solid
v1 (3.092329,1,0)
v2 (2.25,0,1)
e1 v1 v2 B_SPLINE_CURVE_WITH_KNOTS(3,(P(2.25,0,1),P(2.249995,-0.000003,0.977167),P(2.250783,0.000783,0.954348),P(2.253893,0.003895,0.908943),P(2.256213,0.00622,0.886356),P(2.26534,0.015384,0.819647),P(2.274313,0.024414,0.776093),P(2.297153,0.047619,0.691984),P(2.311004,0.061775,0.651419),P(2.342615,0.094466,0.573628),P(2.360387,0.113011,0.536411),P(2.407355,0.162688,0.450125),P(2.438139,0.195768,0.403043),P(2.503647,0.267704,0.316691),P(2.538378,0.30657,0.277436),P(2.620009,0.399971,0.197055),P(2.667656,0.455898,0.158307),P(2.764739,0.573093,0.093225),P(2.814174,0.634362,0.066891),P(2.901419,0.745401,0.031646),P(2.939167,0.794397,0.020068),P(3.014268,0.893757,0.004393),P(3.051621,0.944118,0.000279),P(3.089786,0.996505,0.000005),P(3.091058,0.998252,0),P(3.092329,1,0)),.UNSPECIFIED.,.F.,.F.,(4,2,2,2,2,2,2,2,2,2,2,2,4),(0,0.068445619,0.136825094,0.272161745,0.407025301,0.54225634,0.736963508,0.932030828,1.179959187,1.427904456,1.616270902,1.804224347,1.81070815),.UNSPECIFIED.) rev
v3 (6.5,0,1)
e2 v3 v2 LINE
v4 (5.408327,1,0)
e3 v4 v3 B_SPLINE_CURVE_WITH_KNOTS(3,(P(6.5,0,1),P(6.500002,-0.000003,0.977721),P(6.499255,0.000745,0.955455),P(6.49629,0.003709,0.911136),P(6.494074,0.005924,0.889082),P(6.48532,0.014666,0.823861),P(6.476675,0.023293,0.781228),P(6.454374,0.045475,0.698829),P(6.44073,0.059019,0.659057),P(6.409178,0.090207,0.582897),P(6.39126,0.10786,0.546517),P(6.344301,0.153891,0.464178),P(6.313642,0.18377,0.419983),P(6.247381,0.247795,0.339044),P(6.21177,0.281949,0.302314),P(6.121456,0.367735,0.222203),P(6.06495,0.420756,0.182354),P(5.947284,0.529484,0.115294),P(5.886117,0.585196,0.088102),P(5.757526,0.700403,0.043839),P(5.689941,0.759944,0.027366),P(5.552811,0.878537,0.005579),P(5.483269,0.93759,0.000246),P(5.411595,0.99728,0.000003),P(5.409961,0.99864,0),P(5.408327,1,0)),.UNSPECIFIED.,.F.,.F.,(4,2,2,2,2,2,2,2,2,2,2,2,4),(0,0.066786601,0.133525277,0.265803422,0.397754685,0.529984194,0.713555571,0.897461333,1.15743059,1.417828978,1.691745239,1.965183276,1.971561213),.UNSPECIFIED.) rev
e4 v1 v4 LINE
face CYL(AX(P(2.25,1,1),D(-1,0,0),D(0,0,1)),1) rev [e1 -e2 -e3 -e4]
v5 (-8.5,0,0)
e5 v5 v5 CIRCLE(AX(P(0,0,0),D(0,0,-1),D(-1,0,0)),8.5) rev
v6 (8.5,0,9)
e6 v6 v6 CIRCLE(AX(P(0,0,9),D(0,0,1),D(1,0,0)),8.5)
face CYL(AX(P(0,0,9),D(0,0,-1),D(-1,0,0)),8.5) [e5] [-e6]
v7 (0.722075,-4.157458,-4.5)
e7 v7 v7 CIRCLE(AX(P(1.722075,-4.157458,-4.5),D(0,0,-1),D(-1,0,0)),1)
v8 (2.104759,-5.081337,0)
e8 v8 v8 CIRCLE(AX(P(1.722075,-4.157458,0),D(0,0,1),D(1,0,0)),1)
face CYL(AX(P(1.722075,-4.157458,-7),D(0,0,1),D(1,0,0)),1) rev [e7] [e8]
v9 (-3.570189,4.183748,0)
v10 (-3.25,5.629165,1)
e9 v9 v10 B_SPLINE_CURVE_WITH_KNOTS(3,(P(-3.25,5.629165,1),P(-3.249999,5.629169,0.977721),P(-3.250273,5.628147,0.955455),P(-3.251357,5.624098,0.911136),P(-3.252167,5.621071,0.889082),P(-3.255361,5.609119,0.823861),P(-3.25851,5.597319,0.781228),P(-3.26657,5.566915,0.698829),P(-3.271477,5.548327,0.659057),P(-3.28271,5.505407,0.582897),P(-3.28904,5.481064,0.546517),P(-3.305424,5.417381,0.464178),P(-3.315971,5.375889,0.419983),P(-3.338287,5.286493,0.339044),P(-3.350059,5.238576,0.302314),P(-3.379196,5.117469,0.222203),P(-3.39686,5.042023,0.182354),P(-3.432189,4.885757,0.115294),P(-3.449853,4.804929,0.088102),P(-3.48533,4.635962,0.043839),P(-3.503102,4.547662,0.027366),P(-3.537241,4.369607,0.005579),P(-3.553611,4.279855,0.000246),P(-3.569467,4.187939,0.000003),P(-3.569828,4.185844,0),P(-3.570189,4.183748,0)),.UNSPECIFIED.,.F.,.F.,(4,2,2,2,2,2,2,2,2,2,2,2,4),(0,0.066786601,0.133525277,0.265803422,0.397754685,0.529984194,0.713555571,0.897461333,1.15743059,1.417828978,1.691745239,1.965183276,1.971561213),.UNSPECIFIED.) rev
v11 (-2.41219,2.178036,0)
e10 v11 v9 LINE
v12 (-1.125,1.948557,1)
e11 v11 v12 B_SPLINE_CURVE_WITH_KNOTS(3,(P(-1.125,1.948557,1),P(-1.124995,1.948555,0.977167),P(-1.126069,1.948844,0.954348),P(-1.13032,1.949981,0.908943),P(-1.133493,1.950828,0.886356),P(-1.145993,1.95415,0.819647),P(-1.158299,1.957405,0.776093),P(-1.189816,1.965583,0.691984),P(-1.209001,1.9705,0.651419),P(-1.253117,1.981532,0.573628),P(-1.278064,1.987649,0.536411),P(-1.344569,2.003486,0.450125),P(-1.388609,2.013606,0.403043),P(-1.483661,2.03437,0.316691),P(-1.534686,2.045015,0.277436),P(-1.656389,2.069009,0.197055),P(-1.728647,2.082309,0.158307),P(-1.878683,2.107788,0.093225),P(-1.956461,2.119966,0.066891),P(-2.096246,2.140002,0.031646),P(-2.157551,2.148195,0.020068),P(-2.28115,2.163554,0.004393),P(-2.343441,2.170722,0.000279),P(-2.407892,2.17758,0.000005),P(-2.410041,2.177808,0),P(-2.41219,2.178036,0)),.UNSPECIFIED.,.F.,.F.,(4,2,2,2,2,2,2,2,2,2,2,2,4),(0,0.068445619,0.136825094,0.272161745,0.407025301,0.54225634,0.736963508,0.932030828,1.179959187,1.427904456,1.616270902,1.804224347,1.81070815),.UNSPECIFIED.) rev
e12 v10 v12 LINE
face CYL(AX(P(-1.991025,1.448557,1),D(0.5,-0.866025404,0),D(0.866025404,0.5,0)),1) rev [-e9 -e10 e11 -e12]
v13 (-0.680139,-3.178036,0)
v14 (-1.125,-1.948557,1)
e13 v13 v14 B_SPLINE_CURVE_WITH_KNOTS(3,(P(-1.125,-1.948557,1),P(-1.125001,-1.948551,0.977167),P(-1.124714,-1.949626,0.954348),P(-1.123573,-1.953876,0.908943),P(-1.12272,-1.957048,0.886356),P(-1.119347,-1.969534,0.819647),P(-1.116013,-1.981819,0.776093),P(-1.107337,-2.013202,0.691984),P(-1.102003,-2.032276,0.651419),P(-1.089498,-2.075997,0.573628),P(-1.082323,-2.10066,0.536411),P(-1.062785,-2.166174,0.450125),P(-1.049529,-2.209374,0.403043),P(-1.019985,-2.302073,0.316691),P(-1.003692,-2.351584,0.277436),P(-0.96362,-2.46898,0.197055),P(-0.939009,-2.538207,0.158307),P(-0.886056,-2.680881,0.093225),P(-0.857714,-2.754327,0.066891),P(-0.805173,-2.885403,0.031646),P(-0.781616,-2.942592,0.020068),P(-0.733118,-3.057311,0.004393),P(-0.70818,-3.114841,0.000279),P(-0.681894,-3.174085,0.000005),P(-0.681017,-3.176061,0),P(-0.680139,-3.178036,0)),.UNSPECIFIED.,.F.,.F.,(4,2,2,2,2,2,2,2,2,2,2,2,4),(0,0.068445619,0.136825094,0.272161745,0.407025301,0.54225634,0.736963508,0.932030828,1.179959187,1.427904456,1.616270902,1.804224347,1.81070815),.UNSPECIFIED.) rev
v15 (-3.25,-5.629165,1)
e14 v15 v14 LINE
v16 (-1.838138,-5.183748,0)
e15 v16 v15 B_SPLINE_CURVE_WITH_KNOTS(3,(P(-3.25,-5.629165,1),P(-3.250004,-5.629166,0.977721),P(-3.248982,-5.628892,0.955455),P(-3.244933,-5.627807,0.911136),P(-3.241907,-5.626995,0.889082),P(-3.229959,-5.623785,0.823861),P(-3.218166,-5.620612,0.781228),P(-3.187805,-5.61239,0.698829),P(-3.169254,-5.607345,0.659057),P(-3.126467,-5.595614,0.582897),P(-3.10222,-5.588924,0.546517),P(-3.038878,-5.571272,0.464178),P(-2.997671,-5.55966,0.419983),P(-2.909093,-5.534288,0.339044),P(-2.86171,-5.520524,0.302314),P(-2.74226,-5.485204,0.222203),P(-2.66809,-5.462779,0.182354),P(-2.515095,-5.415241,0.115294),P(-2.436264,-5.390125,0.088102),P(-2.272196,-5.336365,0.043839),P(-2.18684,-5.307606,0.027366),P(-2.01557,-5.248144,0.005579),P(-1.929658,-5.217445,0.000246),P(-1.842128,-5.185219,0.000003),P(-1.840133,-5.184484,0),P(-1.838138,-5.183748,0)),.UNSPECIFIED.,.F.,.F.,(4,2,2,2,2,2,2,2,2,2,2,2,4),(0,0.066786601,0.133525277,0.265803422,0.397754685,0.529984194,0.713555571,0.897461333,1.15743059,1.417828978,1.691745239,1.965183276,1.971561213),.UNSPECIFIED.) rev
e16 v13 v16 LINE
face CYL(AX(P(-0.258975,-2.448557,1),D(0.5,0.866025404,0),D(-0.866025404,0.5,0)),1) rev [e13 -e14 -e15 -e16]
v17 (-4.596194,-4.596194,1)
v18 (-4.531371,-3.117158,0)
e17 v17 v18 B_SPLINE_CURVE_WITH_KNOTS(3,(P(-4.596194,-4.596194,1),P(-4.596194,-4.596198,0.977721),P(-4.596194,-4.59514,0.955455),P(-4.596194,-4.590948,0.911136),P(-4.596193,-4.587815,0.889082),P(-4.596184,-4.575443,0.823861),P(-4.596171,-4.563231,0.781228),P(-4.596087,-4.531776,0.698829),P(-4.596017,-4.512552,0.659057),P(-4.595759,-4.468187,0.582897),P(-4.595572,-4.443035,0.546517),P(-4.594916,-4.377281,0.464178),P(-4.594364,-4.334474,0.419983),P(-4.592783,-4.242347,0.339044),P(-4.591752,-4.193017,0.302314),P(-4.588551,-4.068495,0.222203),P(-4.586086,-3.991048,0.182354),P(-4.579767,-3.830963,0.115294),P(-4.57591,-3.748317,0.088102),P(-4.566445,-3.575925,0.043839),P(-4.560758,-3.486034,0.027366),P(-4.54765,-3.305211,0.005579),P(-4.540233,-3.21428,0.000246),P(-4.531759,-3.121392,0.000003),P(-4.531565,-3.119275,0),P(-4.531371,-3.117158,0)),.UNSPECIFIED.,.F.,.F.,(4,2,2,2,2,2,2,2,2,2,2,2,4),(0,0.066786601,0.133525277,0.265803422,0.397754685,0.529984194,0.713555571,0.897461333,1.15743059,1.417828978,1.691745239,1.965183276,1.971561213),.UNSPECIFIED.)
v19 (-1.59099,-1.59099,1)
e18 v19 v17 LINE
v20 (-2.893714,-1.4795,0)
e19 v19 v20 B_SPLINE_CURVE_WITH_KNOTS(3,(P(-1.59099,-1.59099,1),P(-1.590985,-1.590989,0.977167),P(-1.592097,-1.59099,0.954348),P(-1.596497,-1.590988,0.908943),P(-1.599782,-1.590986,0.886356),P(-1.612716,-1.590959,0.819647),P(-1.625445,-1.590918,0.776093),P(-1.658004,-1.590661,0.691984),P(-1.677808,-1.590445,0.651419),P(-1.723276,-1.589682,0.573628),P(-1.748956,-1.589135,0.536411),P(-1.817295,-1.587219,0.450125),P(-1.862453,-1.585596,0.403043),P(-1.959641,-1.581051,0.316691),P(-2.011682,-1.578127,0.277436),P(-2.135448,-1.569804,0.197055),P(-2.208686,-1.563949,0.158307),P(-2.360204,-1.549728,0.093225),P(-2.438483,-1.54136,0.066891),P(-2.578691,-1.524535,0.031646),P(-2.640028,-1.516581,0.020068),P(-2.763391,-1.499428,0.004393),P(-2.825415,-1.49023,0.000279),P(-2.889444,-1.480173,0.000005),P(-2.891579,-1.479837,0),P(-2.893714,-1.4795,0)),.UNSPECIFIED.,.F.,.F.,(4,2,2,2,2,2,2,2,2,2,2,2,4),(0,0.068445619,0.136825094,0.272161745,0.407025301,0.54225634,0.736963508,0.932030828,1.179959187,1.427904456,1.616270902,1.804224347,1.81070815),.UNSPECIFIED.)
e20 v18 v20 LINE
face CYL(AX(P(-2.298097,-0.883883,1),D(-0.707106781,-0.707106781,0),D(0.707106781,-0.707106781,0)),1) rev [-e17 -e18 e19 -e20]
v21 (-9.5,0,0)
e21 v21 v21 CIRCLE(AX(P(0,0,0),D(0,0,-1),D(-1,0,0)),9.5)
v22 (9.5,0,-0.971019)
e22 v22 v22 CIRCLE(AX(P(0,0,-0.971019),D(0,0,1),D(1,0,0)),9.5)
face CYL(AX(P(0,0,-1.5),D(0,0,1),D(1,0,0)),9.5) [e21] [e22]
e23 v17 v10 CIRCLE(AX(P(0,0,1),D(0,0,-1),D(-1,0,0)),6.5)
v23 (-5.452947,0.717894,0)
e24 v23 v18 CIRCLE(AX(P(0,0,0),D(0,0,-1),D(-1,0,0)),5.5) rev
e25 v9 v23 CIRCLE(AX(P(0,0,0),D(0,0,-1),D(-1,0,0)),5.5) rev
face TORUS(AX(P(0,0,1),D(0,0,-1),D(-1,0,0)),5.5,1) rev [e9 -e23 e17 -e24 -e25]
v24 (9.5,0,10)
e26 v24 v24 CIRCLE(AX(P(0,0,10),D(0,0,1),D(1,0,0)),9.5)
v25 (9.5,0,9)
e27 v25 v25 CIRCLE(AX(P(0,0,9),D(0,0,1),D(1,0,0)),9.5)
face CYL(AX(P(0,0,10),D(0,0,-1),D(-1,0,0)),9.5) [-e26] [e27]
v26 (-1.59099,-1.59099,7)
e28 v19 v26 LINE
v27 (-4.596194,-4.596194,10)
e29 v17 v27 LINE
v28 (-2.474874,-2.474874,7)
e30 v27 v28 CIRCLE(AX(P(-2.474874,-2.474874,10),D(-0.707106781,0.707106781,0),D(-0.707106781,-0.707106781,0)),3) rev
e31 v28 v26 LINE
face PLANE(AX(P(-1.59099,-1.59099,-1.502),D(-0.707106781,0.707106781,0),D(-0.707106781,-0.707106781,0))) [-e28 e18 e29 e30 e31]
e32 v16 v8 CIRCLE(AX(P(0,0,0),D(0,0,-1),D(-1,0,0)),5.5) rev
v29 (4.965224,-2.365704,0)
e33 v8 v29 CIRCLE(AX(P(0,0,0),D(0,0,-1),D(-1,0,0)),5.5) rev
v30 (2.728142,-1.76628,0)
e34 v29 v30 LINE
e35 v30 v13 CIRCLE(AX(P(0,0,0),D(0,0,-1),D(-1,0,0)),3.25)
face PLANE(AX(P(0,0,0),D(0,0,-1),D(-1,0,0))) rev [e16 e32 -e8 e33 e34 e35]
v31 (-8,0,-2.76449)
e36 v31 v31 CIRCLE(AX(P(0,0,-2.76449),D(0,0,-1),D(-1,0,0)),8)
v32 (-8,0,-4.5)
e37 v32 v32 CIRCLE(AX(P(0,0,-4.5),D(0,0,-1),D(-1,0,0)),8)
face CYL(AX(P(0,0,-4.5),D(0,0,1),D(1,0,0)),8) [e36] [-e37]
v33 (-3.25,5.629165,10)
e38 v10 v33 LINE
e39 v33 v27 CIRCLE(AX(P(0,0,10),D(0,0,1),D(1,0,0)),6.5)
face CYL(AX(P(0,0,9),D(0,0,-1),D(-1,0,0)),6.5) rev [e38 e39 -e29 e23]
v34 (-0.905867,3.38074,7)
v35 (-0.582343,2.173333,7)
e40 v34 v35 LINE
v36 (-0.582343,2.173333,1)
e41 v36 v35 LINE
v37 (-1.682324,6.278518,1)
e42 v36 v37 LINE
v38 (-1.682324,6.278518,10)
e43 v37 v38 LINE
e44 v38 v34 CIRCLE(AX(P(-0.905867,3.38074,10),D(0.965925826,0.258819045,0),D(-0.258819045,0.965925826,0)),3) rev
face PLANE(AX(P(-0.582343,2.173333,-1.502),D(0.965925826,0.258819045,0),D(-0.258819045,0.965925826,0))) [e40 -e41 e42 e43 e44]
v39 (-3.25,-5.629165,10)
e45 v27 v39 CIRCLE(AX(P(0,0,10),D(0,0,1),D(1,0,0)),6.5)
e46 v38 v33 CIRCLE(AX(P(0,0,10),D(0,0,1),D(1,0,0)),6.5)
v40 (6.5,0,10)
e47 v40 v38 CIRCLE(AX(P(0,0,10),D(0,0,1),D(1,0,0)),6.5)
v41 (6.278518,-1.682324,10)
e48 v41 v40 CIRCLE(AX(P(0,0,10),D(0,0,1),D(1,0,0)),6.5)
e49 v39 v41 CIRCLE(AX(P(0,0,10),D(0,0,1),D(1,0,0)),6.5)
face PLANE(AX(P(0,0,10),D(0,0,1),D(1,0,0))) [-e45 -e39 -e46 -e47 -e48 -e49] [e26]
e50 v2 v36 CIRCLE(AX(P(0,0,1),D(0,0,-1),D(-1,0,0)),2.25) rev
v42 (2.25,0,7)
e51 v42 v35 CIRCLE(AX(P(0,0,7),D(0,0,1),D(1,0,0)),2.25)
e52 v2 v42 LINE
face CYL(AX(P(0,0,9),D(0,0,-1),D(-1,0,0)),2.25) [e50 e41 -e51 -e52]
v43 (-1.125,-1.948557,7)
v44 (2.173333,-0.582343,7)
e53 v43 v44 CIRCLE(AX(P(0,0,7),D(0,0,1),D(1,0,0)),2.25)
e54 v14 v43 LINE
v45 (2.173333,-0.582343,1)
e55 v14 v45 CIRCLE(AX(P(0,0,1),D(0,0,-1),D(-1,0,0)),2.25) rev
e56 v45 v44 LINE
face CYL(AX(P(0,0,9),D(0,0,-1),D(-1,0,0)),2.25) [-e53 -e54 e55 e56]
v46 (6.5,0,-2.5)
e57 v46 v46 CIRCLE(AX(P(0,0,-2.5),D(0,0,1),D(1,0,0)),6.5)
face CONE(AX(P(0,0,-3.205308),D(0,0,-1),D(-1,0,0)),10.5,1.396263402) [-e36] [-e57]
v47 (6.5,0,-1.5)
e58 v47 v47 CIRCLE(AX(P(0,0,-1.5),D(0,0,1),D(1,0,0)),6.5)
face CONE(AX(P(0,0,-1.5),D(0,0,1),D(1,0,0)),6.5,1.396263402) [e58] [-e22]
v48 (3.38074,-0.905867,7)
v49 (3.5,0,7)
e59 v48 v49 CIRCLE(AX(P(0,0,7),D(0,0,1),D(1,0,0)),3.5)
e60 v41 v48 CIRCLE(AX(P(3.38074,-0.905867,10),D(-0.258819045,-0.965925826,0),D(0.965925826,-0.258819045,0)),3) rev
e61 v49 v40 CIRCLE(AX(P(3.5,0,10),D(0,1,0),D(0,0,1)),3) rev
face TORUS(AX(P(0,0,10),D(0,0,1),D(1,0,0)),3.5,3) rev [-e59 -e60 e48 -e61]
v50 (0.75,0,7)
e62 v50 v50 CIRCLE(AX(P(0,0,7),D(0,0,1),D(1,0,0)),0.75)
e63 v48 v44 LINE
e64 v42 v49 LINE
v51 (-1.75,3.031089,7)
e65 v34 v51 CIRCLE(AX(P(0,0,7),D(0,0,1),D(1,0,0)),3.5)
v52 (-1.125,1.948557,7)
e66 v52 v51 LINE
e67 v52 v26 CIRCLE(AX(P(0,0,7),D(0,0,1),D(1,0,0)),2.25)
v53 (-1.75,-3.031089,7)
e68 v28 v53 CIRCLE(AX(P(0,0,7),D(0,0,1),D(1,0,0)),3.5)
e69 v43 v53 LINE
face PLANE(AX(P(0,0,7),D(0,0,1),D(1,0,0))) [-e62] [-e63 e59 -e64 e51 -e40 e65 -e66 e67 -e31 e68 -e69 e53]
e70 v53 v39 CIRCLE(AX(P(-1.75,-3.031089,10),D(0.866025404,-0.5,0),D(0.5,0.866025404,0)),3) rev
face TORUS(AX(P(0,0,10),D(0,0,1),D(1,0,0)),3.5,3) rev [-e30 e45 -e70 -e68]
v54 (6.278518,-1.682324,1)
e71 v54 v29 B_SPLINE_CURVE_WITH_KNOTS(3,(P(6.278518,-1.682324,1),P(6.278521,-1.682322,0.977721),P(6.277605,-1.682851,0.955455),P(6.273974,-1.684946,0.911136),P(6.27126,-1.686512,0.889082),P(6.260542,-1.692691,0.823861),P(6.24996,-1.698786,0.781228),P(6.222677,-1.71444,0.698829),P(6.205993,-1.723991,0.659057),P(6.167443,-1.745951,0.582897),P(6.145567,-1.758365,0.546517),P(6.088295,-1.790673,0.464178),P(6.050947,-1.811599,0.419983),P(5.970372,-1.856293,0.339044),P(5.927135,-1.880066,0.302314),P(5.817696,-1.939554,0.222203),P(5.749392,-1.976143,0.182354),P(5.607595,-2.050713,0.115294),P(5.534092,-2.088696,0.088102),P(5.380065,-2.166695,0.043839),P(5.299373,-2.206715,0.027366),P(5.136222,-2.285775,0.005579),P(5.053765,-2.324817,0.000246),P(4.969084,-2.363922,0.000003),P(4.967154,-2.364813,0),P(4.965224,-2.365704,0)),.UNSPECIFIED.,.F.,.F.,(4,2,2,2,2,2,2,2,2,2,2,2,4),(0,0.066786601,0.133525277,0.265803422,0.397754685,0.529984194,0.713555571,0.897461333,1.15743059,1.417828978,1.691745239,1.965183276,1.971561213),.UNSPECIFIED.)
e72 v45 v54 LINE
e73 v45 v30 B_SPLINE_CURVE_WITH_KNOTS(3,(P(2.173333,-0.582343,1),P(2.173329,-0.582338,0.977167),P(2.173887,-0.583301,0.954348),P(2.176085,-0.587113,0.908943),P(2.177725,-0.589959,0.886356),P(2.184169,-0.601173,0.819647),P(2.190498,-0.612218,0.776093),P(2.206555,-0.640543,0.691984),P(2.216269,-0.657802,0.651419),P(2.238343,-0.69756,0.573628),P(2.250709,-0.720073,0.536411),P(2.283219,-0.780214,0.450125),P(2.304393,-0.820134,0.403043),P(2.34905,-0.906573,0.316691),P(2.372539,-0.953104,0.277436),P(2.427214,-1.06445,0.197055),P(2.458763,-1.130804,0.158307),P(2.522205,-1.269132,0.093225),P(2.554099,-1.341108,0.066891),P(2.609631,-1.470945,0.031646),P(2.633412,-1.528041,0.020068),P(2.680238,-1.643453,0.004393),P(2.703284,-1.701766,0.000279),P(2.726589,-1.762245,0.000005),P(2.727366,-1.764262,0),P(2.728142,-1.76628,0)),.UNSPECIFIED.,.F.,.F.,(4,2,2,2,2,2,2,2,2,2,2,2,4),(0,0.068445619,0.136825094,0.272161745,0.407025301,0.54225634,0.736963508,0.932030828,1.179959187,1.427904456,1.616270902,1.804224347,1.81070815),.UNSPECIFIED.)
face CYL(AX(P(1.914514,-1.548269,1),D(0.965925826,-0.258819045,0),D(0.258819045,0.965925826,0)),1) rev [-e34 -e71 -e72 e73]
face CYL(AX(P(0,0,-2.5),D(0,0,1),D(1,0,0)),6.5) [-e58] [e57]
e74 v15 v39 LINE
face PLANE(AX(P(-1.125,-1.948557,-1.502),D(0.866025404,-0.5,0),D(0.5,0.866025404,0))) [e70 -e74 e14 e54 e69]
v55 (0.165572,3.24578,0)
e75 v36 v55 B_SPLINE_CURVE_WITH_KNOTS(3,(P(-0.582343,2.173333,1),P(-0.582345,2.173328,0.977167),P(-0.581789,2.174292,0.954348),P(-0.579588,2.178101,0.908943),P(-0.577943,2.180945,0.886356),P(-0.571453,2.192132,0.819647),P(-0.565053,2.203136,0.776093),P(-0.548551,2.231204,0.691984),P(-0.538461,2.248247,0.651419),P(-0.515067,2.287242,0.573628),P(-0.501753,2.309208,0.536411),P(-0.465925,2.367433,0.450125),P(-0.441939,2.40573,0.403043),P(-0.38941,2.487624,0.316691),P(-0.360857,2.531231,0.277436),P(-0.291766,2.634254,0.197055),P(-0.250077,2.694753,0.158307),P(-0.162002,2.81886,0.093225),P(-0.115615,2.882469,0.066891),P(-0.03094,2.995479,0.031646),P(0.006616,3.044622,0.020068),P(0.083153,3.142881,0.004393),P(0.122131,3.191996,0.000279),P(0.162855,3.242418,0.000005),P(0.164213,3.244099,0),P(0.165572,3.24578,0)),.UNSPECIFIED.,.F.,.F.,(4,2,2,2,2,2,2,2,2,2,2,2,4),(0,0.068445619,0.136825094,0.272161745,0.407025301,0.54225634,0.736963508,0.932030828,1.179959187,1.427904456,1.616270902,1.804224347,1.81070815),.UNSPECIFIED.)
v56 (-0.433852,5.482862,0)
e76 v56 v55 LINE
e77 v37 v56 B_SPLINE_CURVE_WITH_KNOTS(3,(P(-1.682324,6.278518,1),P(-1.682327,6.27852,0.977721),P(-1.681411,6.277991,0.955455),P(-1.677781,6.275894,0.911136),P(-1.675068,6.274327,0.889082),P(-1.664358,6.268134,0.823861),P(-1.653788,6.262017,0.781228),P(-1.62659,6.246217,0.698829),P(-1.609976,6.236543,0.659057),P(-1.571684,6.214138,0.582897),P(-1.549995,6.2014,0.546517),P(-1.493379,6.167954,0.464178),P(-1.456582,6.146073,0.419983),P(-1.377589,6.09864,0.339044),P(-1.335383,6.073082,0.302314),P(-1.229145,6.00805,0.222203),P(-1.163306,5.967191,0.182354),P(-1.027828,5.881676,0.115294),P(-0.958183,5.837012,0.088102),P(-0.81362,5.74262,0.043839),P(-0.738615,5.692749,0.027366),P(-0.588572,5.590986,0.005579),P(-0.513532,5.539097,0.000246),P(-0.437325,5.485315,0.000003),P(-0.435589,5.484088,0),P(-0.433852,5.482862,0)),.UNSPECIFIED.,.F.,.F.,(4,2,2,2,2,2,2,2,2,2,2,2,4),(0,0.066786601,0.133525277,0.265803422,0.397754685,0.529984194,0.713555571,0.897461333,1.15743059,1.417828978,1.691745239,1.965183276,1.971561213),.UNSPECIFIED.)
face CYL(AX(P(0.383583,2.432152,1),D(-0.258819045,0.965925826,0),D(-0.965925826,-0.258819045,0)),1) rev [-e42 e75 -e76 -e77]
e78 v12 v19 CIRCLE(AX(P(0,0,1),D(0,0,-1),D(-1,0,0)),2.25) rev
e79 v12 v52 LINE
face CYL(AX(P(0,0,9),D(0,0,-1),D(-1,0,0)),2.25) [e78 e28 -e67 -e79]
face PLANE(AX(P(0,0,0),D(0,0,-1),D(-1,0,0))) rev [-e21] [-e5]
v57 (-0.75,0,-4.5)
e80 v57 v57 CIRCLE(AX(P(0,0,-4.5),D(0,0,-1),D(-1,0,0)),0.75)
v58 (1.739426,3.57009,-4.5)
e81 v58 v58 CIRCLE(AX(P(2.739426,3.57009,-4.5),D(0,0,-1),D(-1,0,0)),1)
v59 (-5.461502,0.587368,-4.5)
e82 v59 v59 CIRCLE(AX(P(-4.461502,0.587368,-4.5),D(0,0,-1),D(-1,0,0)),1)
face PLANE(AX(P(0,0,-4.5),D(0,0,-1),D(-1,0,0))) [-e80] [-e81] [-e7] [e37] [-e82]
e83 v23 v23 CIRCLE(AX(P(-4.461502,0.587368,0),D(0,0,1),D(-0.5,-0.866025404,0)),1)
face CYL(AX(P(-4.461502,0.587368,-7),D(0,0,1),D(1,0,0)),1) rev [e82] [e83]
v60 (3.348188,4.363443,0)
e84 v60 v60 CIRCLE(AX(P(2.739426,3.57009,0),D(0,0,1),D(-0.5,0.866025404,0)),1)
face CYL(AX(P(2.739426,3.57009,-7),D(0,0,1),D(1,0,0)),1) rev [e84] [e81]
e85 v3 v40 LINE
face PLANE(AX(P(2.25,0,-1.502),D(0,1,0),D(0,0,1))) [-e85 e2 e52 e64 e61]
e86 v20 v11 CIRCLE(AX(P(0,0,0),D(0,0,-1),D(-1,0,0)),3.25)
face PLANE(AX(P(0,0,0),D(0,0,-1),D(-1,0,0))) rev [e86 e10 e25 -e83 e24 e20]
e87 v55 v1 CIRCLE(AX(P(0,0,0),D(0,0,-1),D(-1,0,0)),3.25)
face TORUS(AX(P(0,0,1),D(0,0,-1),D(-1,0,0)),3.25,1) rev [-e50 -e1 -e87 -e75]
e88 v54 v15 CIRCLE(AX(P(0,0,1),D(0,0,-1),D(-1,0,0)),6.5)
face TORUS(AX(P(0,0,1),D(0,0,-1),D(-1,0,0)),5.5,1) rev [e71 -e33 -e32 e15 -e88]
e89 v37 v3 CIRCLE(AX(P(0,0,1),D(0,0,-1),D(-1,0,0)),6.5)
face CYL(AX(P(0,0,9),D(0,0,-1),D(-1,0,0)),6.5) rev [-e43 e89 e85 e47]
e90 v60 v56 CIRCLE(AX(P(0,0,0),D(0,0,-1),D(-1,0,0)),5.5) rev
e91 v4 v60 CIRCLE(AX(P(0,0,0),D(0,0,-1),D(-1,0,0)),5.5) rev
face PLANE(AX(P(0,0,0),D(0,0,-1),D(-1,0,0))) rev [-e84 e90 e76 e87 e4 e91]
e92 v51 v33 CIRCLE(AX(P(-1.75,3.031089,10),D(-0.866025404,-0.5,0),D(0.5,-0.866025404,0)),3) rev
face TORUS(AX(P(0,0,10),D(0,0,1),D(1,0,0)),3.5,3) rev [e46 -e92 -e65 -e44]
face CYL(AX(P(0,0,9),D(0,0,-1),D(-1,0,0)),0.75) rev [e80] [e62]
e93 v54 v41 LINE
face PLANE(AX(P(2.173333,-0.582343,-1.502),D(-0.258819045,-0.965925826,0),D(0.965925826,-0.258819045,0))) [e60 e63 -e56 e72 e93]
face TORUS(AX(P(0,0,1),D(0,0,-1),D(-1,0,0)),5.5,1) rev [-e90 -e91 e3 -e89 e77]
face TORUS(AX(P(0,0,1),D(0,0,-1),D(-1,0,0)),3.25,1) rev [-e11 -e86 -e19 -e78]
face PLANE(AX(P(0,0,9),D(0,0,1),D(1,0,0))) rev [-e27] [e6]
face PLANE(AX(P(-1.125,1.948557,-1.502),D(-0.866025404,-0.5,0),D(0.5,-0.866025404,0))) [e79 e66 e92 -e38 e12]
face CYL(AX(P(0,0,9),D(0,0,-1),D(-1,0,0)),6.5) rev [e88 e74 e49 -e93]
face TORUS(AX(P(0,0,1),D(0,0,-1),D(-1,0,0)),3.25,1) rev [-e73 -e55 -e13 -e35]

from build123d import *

# Parameters (mm, degrees)
SKETCH1_R             = 8.5
SKETCH1_R_2           = 6.5
BOSS_EXTRUDE1_DEPTH   = 9
SKETCH1_R_3           = 2.25
SKETCH1_R_4           = 0.75
BOSS_EXTRUDE1_2_DEPTH = 9
SKETCH2_R             = 9.5
BOSS_EXTRUDE2_DEPTH   = 1.5
SKETCH3_R             = 9.5
SKETCH3_R_2           = 6.5
BOSS_EXTRUDE3_DEPTH   = 1
BOSS_EXTRUDE4_REACH   = 19.051
CIRPATTERN1_COUNT     = 3
CUT_EXTRUDE2_START    = -2
SKETCH6_R             = 6.5
CUT_EXTRUDE2_DEPTH    = 2
FILLET1_R             = 3
BOSS_EXTRUDE5_START   = 1
SKETCH8_R             = 6.5
BOSS_EXTRUDE5_DEPTH   = 1
SKETCH11_R            = 8
BOSS_EXTRUDE6_DEPTH   = 2
SKETCH7_R             = 1
CUT_EXTRUDE3_DEPTH    = 7
FILLET2_R             = 1
CIRPATTERN2_COUNT     = 3
CUT_EXTRUDE4_START    = -20
SKETCH4_R             = 0.75
CUT_EXTRUDE4_DEPTH    = 20


with BuildPart() as part:
    # Sketch1 → Boss-Extrude1 (new body)
    with BuildSketch(Plane.XY):
        Circle(SKETCH1_R)
        Circle(SKETCH1_R_2, mode=Mode.SUBTRACT)
    extrude(amount=BOSS_EXTRUDE1_DEPTH)



with BuildPart() as body_2:
    # Sketch1 → Boss-Extrude1 2 (new body)
    with BuildSketch(Plane.XY):
        Circle(SKETCH1_R_3)
        Circle(SKETCH1_R_4, mode=Mode.SUBTRACT)
    extrude(amount=BOSS_EXTRUDE1_2_DEPTH)


with BuildPart() as part_1:
    add(part.part)

    add(body_2.part)  # Boss-Extrude2 merges body 2
    # Sketch2 → Boss-Extrude2 (add)
    with BuildSketch(Plane(origin=(0, 0, 0), x_dir=(-1, 0, 0), z_dir=(0, 0, -1))):
        Circle(SKETCH2_R)
    extrude(amount=BOSS_EXTRUDE2_DEPTH)

    # Sketch3 → Boss-Extrude3 (add)
    with BuildSketch(Plane.XY.offset(9)):
        Circle(SKETCH3_R)
        Circle(SKETCH3_R_2, mode=Mode.SUBTRACT)
    extrude(amount=BOSS_EXTRUDE3_DEPTH)

    # Sketch5 → Boss-Extrude4 (add, up to next)
    with BuildSketch(Plane.XY.offset(9), mode=Mode.PRIVATE) as boss_extrude4_sk1:
        with BuildLine():
            Line((2.25, 0), (6.5, 0))
            ThreePointArc((6.5, 0), (6.444391599, -0.848420249), (6.278517871, -1.682323793))
            Line((6.278517871, -1.682323793), (2.173333109, -0.582342851))
            ThreePointArc((2.173333109, -0.582342851), (2.230750938, -0.293683932), (2.25, 0))
        make_face()
    boss_extrude4_tool1 = extrude(boss_extrude4_sk1.sketch, amount=-BOSS_EXTRUDE4_REACH, mode=Mode.PRIVATE) - part_1.part
    boss_extrude4 = boss_extrude4_tool1.solids().sort_by_distance((4.665326, -0.614202, 9))[0]
    add(boss_extrude4)

    # CirPattern1: Boss-Extrude4 ×3 about axis
    cirpattern1_axis = Axis((0, 0, 0), (0, 0, 1))
    for i in range(1, CIRPATTERN1_COUNT):
        add(boss_extrude4.rotate(cirpattern1_axis, i * 360 / CIRPATTERN1_COUNT))

    # Sketch6 → Cut-Extrude2 (cut)
    with BuildSketch(Plane.XY.offset(9).offset(CUT_EXTRUDE2_START)):
        Circle(SKETCH6_R)
    extrude(amount=CUT_EXTRUDE2_DEPTH, mode=Mode.SUBTRACT)

    # Fillet1
    # the kernel refuses this fillet: 3 mm, written as the material it adds along each edge
    with BuildSketch(Plane(origin=(0, 0, 7), x_dir=(0.9659258262890711, -0.2588190451025104, 0), z_dir=(-0.2588190451025104, -0.9659258262890711, 0))) as fillet1_piece_1:
        with BuildLine():
            CenterArc((6.5 - FILLET1_R, FILLET1_R), FILLET1_R, 270, 90)
            Line((6.5 - FILLET1_R, 0), (6.5, 0))
            Line((6.5, 0), (6.5, FILLET1_R))
        make_face()
    revolve(axis=Axis((0, 0, 7), (0, 0, 1)), revolution_arc=15)
    with BuildSketch(Plane(origin=(0, 0, 7), x_dir=(-0.2588190451025142, 0.9659258262890701, 0), z_dir=(0.9659258262890701, 0.2588190451025142, 0))) as fillet1_piece_2:
        with BuildLine():
            CenterArc((6.5 - FILLET1_R, FILLET1_R), FILLET1_R, 270, 90)
            Line((6.5 - FILLET1_R, 0), (6.5, 0))
            Line((6.5, 0), (6.5, FILLET1_R))
        make_face()
    revolve(axis=Axis((0, 0, 7), (0, 0, 1)), revolution_arc=15)
    with BuildSketch(Plane(origin=(0, 0, 7), x_dir=(-0.7071067811865505, -0.7071067811865446, 0), z_dir=(-0.7071067811865446, 0.7071067811865505, 0))) as fillet1_piece_3:
        with BuildLine():
            CenterArc((6.5 - FILLET1_R, FILLET1_R), FILLET1_R, 270, 90)
            Line((6.5 - FILLET1_R, 0), (6.5, 0))
            Line((6.5, 0), (6.5, FILLET1_R))
        make_face()
    revolve(axis=Axis((0, 0, 7), (0, 0, 1)), revolution_arc=15)

    # Sketch8 → Boss-Extrude5 (add)
    with BuildSketch(Plane(origin=(0, 0, -1.5), x_dir=(-1, 0, 0), z_dir=(0, 0, -1)).offset(BOSS_EXTRUDE5_START)):
        Circle(SKETCH8_R)
    extrude(amount=-BOSS_EXTRUDE5_DEPTH)

    # Sketch11 → Boss-Extrude6 (add)
    with BuildSketch(Plane(origin=(0, 0, -2.5), x_dir=(-1, 0, 0), z_dir=(0, 0, -1))):
        Circle(SKETCH11_R)
    extrude(amount=BOSS_EXTRUDE6_DEPTH)

    # Sketch7 → Cut-Extrude3 (cut)
    with BuildSketch(Plane.XY):
        with Locations((1.722075446, -4.157457896)):
            Circle(SKETCH7_R)
    cut_extrude3 = extrude(amount=-CUT_EXTRUDE3_DEPTH, mode=Mode.SUBTRACT)

    # Fillet2
    # the kernel refuses this fillet: 1 mm, written as the material it adds along each edge
    with BuildSketch(Plane(origin=(0, 0, 0), x_dir=(0.9268638778365579, -0.37539759184333915, 0), z_dir=(-0.37539759184333915, -0.9268638778365579, 0))) as fillet2_piece_1:
        with BuildLine():
            CenterArc((6.5 - FILLET2_R, FILLET2_R), FILLET2_R, 270, 90)
            Line((6.5 - FILLET2_R, 0), (6.5, 0))
            Line((6.5, 0), (6.5, FILLET2_R))
        make_face()
    revolve(axis=Axis((0, 0, 0), (0, 0, 1)), revolution_arc=149.097777135)
    with BuildSketch(Plane(origin=(-0.25, 0, 0), x_dir=(0, 0, 1), z_dir=(1, 0, 0))) as fillet2_piece_2_section:
        with BuildLine():
            CenterArc((FILLET2_R, -FILLET2_R), FILLET2_R, 90, 90)
            Line((0, -FILLET2_R), (0, 0))
            Line((0, 0), (FILLET2_R, 0))
        make_face()
    fillet2_piece_2 = extrude(amount=9.25, mode=Mode.PRIVATE)
    fillet2_piece_2 = fillet2_piece_2 & Plane(origin=(0, 0, 0.222961637), x_dir=(1, 0, 0), z_dir=(0, 0, -1)) * Cylinder(6.5, 23, mode=Mode.PRIVATE)
    fillet2_piece_2 = fillet2_piece_2 - Plane(origin=(0, 0, 0.222961637), x_dir=(1, 0, 0), z_dir=(0, 0, -1)) * Cylinder(0.75, 23, mode=Mode.PRIVATE)
    add(fillet2_piece_2)
    with BuildSketch(Plane(origin=(8.693332437, -2.329371406, 0), x_dir=(-0.25881904510252135, -0.9659258262890682, 0), z_dir=(-0.9659258262890682, 0.25881904510252135, 0))) as fillet2_piece_3_section:
        with BuildLine():
            CenterArc((FILLET2_R, FILLET2_R), FILLET2_R, 180, 90)
            Line((0, FILLET2_R), (0, 0))
            Line((0, 0), (FILLET2_R, 0))
        make_face()
    fillet2_piece_3 = extrude(amount=9.25, mode=Mode.PRIVATE)
    fillet2_piece_3 = fillet2_piece_3 & Plane(origin=(0, 0, 0.22296165), x_dir=(1, 0, 0), z_dir=(0, 0, -1)) * Cylinder(8.5, 23, mode=Mode.PRIVATE)
    fillet2_piece_3 = fillet2_piece_3 - Plane(origin=(0, 0, 0.22296165), x_dir=(1, 0, 0), z_dir=(0, 0, -1)) * Cylinder(0.75, 23, mode=Mode.PRIVATE)
    add(fillet2_piece_3)
    with BuildSketch(Plane(origin=(0, 0, 0), x_dir=(-0.138328087862445, 0.9903864599782852, 0), z_dir=(0.9903864599782852, 0.138328087862445, 0))) as fillet2_piece_4:
        with BuildLine():
            CenterArc((6.5 - FILLET2_R, FILLET2_R), FILLET2_R, 270, 90)
            Line((6.5 - FILLET2_R, 0), (6.5, 0))
            Line((6.5, 0), (6.5, FILLET2_R))
        make_face()
    revolve(axis=Axis((0, 0, 0), (0, 0, 1)), revolution_arc=149.097777135)
    with BuildSketch(Plane(origin=(0, 0, 0), x_dir=(0.5547978045957125, 0.8319852138204006, 0), z_dir=(0.8319852138204006, -0.5547978045957125, 0))) as fillet2_piece_5:
        with BuildLine():
            CenterArc((2.25 + FILLET2_R, FILLET2_R), FILLET2_R, 180, 90)
            Line((2.25 + FILLET2_R, 0), (2.25, 0))
            Line((2.25, 0), (2.25, FILLET2_R))
        make_face()
    revolve(axis=Axis((0, 0, 0), (0, 0, 1)), revolution_arc=232.393578389)
    with BuildSketch(Plane(origin=(0.125, -0.216506351, 0), x_dir=(0, 0, 1), z_dir=(-0.49999999999999983, 0.8660254037844388, 0))) as fillet2_piece_6_section:
        with BuildLine():
            CenterArc((FILLET2_R, -FILLET2_R), FILLET2_R, 90, 90)
            Line((0, -FILLET2_R), (0, 0))
            Line((0, 0), (FILLET2_R, 0))
        make_face()
    fillet2_piece_6 = extrude(amount=9.25, mode=Mode.PRIVATE)
    fillet2_piece_6 = fillet2_piece_6 & Plane(origin=(0, 0, 0.222961635), x_dir=(1, 0, 0), z_dir=(0, 0, -1)) * Cylinder(6.5, 23, mode=Mode.PRIVATE)
    fillet2_piece_6 = fillet2_piece_6 - Plane(origin=(0, 0, 0.222961635), x_dir=(1, 0, 0), z_dir=(0, 0, -1)) * Cylinder(0.75, 23, mode=Mode.PRIVATE)
    add(fillet2_piece_6)
    with BuildSketch(Plane(origin=(-2.329371406, 8.693332437, 0), x_dir=(0, 0, 1), z_dir=(0.25881904510251996, -0.9659258262890685, 0))) as fillet2_piece_7_section:
        with BuildLine():
            CenterArc((FILLET2_R, -FILLET2_R), FILLET2_R, 90, 90)
            Line((0, -FILLET2_R), (0, 0))
            Line((0, 0), (FILLET2_R, 0))
        make_face()
    fillet2_piece_7 = extrude(amount=9.25, mode=Mode.PRIVATE)
    fillet2_piece_7 = fillet2_piece_7 & Plane(origin=(0, 0, 0.222961632), x_dir=(1, 0, 0), z_dir=(0, 0, -1)) * Cylinder(6.5, 23, mode=Mode.PRIVATE)
    fillet2_piece_7 = fillet2_piece_7 - Plane(origin=(0, 0, 0.222961632), x_dir=(1, 0, 0), z_dir=(0, 0, -1)) * Cylinder(0.75, 23, mode=Mode.PRIVATE)
    add(fillet2_piece_7)
    with BuildSketch(Plane(origin=(0, 0, 0), x_dir=(-0.7885357899741134, -0.614988868134945, 0), z_dir=(-0.614988868134945, 0.7885357899741134, 0))) as fillet2_piece_8:
        with BuildLine():
            CenterArc((6.5 - FILLET2_R, FILLET2_R), FILLET2_R, 270, 90)
            Line((6.5, FILLET2_R), (6.5, 0))
            Line((6.5, 0), (6.5 - FILLET2_R, 0))
        make_face()
    revolve(axis=Axis((0, 0, 0), (0, 0, 1)), revolution_arc=149.097777135)
    with BuildSketch(Plane(origin=(0, 0, 0), x_dir=(-0.9979192330393512, 0.06447638583352278, 0), z_dir=(0.06447638583352278, 0.9979192330393512, 0))) as fillet2_piece_9:
        with BuildLine():
            CenterArc((2.25 + FILLET2_R, FILLET2_R), FILLET2_R, 180, 90)
            Line((2.25, FILLET2_R), (2.25, 0))
            Line((2.25, 0), (2.25 + FILLET2_R, 0))
        make_face()
    revolve(axis=Axis((0, 0, 0), (0, 0, 1)), revolution_arc=232.393578389)
    with BuildSketch(Plane(origin=(0.125, 0.216506351, 0), x_dir=(0.8660254037844384, -0.5000000000000004, 0), z_dir=(-0.5000000000000004, -0.8660254037844384, 0))) as fillet2_piece_10_section:
        with BuildLine():
            CenterArc((FILLET2_R, FILLET2_R), FILLET2_R, 180, 90)
            Line((0, FILLET2_R), (0, 0))
            Line((0, 0), (FILLET2_R, 0))
        make_face()
    fillet2_piece_10 = extrude(amount=9.25, mode=Mode.PRIVATE)
    fillet2_piece_10 = fillet2_piece_10 & Plane(origin=(0, 0, 0.222961624), x_dir=(1, 0, 0), z_dir=(0, 0, -1)) * Cylinder(8.5, 23, mode=Mode.PRIVATE)
    fillet2_piece_10 = fillet2_piece_10 - Plane(origin=(0, 0, 0.222961624), x_dir=(1, 0, 0), z_dir=(0, 0, -1)) * Cylinder(0.75, 23, mode=Mode.PRIVATE)
    add(fillet2_piece_10)
    with BuildSketch(Plane(origin=(-6.363961031, -6.363961031, 0), x_dir=(0, 0, 1), z_dir=(0.7071067811865483, 0.7071067811865468, 0))) as fillet2_piece_11_section:
        with BuildLine():
            CenterArc((FILLET2_R, -FILLET2_R), FILLET2_R, 90, 90)
            Line((0, -FILLET2_R), (0, 0))
            Line((0, 0), (FILLET2_R, 0))
        make_face()
    fillet2_piece_11 = extrude(amount=9.25, mode=Mode.PRIVATE)
    fillet2_piece_11 = fillet2_piece_11 & Plane(origin=(0, 0, 0.22296162), x_dir=(1, 0, 0), z_dir=(0, 0, -1)) * Cylinder(6.5, 23, mode=Mode.PRIVATE)
    fillet2_piece_11 = fillet2_piece_11 - Plane(origin=(0, 0, 0.22296162), x_dir=(1, 0, 0), z_dir=(0, 0, -1)) * Cylinder(0.75, 23, mode=Mode.PRIVATE)
    add(fillet2_piece_11)
    with BuildSketch(Plane(origin=(0, 0, 0), x_dir=(0.44312142844363894, -0.8964615996539222, 0), z_dir=(-0.8964615996539222, -0.44312142844363894, 0))) as fillet2_piece_12:
        with BuildLine():
            CenterArc((2.25 + FILLET2_R, FILLET2_R), FILLET2_R, 180, 90)
            Line((2.25 + FILLET2_R, 0), (2.25, 0))
            Line((2.25, 0), (2.25, FILLET2_R))
        make_face()
    revolve(axis=Axis((0, 0, 0), (0, 0, 1)), revolution_arc=232.393578389)

    # CirPattern2: Cut-Extrude3 ×3 about axis
    cirpattern2_axis = Axis((0, 0, 0), (0, 0, 1))
    for i in range(1, CIRPATTERN2_COUNT):
        add(cut_extrude3.rotate(cirpattern2_axis, i * 360 / CIRPATTERN2_COUNT), mode=Mode.SUBTRACT)

    # Sketch4 → Cut-Extrude4 (cut)
    with BuildSketch(Plane.XY.offset(7).offset(CUT_EXTRUDE4_START)):
        with Locations(Location((0, 0, 0), (0, 0, 180))):
            Circle(SKETCH4_R)
    extrude(amount=CUT_EXTRUDE4_DEPTH, mode=Mode.SUBTRACT)

    # Sketch12 → Cut-Revolve1 (revolve, cut)
    with BuildSketch(Plane(origin=(0, 0, 0), x_dir=(1, 0, 0), z_dir=(0, 1, 0)), mode=Mode.PRIVATE) as cut_revolve1_sk:
        Polygon((6.5, 2.5), (10.5, 3.205307923), (10.5, 0.794692077), (6.5, 1.5), align=None)
    revolve(cut_revolve1_sk.sketch.rotate(Axis((0, 0, 0), (0, 0, -1)), 180), axis=Axis((0, 0, 0), (0, 0, -1)), mode=Mode.SUBTRACT)


solid = part_1.part
